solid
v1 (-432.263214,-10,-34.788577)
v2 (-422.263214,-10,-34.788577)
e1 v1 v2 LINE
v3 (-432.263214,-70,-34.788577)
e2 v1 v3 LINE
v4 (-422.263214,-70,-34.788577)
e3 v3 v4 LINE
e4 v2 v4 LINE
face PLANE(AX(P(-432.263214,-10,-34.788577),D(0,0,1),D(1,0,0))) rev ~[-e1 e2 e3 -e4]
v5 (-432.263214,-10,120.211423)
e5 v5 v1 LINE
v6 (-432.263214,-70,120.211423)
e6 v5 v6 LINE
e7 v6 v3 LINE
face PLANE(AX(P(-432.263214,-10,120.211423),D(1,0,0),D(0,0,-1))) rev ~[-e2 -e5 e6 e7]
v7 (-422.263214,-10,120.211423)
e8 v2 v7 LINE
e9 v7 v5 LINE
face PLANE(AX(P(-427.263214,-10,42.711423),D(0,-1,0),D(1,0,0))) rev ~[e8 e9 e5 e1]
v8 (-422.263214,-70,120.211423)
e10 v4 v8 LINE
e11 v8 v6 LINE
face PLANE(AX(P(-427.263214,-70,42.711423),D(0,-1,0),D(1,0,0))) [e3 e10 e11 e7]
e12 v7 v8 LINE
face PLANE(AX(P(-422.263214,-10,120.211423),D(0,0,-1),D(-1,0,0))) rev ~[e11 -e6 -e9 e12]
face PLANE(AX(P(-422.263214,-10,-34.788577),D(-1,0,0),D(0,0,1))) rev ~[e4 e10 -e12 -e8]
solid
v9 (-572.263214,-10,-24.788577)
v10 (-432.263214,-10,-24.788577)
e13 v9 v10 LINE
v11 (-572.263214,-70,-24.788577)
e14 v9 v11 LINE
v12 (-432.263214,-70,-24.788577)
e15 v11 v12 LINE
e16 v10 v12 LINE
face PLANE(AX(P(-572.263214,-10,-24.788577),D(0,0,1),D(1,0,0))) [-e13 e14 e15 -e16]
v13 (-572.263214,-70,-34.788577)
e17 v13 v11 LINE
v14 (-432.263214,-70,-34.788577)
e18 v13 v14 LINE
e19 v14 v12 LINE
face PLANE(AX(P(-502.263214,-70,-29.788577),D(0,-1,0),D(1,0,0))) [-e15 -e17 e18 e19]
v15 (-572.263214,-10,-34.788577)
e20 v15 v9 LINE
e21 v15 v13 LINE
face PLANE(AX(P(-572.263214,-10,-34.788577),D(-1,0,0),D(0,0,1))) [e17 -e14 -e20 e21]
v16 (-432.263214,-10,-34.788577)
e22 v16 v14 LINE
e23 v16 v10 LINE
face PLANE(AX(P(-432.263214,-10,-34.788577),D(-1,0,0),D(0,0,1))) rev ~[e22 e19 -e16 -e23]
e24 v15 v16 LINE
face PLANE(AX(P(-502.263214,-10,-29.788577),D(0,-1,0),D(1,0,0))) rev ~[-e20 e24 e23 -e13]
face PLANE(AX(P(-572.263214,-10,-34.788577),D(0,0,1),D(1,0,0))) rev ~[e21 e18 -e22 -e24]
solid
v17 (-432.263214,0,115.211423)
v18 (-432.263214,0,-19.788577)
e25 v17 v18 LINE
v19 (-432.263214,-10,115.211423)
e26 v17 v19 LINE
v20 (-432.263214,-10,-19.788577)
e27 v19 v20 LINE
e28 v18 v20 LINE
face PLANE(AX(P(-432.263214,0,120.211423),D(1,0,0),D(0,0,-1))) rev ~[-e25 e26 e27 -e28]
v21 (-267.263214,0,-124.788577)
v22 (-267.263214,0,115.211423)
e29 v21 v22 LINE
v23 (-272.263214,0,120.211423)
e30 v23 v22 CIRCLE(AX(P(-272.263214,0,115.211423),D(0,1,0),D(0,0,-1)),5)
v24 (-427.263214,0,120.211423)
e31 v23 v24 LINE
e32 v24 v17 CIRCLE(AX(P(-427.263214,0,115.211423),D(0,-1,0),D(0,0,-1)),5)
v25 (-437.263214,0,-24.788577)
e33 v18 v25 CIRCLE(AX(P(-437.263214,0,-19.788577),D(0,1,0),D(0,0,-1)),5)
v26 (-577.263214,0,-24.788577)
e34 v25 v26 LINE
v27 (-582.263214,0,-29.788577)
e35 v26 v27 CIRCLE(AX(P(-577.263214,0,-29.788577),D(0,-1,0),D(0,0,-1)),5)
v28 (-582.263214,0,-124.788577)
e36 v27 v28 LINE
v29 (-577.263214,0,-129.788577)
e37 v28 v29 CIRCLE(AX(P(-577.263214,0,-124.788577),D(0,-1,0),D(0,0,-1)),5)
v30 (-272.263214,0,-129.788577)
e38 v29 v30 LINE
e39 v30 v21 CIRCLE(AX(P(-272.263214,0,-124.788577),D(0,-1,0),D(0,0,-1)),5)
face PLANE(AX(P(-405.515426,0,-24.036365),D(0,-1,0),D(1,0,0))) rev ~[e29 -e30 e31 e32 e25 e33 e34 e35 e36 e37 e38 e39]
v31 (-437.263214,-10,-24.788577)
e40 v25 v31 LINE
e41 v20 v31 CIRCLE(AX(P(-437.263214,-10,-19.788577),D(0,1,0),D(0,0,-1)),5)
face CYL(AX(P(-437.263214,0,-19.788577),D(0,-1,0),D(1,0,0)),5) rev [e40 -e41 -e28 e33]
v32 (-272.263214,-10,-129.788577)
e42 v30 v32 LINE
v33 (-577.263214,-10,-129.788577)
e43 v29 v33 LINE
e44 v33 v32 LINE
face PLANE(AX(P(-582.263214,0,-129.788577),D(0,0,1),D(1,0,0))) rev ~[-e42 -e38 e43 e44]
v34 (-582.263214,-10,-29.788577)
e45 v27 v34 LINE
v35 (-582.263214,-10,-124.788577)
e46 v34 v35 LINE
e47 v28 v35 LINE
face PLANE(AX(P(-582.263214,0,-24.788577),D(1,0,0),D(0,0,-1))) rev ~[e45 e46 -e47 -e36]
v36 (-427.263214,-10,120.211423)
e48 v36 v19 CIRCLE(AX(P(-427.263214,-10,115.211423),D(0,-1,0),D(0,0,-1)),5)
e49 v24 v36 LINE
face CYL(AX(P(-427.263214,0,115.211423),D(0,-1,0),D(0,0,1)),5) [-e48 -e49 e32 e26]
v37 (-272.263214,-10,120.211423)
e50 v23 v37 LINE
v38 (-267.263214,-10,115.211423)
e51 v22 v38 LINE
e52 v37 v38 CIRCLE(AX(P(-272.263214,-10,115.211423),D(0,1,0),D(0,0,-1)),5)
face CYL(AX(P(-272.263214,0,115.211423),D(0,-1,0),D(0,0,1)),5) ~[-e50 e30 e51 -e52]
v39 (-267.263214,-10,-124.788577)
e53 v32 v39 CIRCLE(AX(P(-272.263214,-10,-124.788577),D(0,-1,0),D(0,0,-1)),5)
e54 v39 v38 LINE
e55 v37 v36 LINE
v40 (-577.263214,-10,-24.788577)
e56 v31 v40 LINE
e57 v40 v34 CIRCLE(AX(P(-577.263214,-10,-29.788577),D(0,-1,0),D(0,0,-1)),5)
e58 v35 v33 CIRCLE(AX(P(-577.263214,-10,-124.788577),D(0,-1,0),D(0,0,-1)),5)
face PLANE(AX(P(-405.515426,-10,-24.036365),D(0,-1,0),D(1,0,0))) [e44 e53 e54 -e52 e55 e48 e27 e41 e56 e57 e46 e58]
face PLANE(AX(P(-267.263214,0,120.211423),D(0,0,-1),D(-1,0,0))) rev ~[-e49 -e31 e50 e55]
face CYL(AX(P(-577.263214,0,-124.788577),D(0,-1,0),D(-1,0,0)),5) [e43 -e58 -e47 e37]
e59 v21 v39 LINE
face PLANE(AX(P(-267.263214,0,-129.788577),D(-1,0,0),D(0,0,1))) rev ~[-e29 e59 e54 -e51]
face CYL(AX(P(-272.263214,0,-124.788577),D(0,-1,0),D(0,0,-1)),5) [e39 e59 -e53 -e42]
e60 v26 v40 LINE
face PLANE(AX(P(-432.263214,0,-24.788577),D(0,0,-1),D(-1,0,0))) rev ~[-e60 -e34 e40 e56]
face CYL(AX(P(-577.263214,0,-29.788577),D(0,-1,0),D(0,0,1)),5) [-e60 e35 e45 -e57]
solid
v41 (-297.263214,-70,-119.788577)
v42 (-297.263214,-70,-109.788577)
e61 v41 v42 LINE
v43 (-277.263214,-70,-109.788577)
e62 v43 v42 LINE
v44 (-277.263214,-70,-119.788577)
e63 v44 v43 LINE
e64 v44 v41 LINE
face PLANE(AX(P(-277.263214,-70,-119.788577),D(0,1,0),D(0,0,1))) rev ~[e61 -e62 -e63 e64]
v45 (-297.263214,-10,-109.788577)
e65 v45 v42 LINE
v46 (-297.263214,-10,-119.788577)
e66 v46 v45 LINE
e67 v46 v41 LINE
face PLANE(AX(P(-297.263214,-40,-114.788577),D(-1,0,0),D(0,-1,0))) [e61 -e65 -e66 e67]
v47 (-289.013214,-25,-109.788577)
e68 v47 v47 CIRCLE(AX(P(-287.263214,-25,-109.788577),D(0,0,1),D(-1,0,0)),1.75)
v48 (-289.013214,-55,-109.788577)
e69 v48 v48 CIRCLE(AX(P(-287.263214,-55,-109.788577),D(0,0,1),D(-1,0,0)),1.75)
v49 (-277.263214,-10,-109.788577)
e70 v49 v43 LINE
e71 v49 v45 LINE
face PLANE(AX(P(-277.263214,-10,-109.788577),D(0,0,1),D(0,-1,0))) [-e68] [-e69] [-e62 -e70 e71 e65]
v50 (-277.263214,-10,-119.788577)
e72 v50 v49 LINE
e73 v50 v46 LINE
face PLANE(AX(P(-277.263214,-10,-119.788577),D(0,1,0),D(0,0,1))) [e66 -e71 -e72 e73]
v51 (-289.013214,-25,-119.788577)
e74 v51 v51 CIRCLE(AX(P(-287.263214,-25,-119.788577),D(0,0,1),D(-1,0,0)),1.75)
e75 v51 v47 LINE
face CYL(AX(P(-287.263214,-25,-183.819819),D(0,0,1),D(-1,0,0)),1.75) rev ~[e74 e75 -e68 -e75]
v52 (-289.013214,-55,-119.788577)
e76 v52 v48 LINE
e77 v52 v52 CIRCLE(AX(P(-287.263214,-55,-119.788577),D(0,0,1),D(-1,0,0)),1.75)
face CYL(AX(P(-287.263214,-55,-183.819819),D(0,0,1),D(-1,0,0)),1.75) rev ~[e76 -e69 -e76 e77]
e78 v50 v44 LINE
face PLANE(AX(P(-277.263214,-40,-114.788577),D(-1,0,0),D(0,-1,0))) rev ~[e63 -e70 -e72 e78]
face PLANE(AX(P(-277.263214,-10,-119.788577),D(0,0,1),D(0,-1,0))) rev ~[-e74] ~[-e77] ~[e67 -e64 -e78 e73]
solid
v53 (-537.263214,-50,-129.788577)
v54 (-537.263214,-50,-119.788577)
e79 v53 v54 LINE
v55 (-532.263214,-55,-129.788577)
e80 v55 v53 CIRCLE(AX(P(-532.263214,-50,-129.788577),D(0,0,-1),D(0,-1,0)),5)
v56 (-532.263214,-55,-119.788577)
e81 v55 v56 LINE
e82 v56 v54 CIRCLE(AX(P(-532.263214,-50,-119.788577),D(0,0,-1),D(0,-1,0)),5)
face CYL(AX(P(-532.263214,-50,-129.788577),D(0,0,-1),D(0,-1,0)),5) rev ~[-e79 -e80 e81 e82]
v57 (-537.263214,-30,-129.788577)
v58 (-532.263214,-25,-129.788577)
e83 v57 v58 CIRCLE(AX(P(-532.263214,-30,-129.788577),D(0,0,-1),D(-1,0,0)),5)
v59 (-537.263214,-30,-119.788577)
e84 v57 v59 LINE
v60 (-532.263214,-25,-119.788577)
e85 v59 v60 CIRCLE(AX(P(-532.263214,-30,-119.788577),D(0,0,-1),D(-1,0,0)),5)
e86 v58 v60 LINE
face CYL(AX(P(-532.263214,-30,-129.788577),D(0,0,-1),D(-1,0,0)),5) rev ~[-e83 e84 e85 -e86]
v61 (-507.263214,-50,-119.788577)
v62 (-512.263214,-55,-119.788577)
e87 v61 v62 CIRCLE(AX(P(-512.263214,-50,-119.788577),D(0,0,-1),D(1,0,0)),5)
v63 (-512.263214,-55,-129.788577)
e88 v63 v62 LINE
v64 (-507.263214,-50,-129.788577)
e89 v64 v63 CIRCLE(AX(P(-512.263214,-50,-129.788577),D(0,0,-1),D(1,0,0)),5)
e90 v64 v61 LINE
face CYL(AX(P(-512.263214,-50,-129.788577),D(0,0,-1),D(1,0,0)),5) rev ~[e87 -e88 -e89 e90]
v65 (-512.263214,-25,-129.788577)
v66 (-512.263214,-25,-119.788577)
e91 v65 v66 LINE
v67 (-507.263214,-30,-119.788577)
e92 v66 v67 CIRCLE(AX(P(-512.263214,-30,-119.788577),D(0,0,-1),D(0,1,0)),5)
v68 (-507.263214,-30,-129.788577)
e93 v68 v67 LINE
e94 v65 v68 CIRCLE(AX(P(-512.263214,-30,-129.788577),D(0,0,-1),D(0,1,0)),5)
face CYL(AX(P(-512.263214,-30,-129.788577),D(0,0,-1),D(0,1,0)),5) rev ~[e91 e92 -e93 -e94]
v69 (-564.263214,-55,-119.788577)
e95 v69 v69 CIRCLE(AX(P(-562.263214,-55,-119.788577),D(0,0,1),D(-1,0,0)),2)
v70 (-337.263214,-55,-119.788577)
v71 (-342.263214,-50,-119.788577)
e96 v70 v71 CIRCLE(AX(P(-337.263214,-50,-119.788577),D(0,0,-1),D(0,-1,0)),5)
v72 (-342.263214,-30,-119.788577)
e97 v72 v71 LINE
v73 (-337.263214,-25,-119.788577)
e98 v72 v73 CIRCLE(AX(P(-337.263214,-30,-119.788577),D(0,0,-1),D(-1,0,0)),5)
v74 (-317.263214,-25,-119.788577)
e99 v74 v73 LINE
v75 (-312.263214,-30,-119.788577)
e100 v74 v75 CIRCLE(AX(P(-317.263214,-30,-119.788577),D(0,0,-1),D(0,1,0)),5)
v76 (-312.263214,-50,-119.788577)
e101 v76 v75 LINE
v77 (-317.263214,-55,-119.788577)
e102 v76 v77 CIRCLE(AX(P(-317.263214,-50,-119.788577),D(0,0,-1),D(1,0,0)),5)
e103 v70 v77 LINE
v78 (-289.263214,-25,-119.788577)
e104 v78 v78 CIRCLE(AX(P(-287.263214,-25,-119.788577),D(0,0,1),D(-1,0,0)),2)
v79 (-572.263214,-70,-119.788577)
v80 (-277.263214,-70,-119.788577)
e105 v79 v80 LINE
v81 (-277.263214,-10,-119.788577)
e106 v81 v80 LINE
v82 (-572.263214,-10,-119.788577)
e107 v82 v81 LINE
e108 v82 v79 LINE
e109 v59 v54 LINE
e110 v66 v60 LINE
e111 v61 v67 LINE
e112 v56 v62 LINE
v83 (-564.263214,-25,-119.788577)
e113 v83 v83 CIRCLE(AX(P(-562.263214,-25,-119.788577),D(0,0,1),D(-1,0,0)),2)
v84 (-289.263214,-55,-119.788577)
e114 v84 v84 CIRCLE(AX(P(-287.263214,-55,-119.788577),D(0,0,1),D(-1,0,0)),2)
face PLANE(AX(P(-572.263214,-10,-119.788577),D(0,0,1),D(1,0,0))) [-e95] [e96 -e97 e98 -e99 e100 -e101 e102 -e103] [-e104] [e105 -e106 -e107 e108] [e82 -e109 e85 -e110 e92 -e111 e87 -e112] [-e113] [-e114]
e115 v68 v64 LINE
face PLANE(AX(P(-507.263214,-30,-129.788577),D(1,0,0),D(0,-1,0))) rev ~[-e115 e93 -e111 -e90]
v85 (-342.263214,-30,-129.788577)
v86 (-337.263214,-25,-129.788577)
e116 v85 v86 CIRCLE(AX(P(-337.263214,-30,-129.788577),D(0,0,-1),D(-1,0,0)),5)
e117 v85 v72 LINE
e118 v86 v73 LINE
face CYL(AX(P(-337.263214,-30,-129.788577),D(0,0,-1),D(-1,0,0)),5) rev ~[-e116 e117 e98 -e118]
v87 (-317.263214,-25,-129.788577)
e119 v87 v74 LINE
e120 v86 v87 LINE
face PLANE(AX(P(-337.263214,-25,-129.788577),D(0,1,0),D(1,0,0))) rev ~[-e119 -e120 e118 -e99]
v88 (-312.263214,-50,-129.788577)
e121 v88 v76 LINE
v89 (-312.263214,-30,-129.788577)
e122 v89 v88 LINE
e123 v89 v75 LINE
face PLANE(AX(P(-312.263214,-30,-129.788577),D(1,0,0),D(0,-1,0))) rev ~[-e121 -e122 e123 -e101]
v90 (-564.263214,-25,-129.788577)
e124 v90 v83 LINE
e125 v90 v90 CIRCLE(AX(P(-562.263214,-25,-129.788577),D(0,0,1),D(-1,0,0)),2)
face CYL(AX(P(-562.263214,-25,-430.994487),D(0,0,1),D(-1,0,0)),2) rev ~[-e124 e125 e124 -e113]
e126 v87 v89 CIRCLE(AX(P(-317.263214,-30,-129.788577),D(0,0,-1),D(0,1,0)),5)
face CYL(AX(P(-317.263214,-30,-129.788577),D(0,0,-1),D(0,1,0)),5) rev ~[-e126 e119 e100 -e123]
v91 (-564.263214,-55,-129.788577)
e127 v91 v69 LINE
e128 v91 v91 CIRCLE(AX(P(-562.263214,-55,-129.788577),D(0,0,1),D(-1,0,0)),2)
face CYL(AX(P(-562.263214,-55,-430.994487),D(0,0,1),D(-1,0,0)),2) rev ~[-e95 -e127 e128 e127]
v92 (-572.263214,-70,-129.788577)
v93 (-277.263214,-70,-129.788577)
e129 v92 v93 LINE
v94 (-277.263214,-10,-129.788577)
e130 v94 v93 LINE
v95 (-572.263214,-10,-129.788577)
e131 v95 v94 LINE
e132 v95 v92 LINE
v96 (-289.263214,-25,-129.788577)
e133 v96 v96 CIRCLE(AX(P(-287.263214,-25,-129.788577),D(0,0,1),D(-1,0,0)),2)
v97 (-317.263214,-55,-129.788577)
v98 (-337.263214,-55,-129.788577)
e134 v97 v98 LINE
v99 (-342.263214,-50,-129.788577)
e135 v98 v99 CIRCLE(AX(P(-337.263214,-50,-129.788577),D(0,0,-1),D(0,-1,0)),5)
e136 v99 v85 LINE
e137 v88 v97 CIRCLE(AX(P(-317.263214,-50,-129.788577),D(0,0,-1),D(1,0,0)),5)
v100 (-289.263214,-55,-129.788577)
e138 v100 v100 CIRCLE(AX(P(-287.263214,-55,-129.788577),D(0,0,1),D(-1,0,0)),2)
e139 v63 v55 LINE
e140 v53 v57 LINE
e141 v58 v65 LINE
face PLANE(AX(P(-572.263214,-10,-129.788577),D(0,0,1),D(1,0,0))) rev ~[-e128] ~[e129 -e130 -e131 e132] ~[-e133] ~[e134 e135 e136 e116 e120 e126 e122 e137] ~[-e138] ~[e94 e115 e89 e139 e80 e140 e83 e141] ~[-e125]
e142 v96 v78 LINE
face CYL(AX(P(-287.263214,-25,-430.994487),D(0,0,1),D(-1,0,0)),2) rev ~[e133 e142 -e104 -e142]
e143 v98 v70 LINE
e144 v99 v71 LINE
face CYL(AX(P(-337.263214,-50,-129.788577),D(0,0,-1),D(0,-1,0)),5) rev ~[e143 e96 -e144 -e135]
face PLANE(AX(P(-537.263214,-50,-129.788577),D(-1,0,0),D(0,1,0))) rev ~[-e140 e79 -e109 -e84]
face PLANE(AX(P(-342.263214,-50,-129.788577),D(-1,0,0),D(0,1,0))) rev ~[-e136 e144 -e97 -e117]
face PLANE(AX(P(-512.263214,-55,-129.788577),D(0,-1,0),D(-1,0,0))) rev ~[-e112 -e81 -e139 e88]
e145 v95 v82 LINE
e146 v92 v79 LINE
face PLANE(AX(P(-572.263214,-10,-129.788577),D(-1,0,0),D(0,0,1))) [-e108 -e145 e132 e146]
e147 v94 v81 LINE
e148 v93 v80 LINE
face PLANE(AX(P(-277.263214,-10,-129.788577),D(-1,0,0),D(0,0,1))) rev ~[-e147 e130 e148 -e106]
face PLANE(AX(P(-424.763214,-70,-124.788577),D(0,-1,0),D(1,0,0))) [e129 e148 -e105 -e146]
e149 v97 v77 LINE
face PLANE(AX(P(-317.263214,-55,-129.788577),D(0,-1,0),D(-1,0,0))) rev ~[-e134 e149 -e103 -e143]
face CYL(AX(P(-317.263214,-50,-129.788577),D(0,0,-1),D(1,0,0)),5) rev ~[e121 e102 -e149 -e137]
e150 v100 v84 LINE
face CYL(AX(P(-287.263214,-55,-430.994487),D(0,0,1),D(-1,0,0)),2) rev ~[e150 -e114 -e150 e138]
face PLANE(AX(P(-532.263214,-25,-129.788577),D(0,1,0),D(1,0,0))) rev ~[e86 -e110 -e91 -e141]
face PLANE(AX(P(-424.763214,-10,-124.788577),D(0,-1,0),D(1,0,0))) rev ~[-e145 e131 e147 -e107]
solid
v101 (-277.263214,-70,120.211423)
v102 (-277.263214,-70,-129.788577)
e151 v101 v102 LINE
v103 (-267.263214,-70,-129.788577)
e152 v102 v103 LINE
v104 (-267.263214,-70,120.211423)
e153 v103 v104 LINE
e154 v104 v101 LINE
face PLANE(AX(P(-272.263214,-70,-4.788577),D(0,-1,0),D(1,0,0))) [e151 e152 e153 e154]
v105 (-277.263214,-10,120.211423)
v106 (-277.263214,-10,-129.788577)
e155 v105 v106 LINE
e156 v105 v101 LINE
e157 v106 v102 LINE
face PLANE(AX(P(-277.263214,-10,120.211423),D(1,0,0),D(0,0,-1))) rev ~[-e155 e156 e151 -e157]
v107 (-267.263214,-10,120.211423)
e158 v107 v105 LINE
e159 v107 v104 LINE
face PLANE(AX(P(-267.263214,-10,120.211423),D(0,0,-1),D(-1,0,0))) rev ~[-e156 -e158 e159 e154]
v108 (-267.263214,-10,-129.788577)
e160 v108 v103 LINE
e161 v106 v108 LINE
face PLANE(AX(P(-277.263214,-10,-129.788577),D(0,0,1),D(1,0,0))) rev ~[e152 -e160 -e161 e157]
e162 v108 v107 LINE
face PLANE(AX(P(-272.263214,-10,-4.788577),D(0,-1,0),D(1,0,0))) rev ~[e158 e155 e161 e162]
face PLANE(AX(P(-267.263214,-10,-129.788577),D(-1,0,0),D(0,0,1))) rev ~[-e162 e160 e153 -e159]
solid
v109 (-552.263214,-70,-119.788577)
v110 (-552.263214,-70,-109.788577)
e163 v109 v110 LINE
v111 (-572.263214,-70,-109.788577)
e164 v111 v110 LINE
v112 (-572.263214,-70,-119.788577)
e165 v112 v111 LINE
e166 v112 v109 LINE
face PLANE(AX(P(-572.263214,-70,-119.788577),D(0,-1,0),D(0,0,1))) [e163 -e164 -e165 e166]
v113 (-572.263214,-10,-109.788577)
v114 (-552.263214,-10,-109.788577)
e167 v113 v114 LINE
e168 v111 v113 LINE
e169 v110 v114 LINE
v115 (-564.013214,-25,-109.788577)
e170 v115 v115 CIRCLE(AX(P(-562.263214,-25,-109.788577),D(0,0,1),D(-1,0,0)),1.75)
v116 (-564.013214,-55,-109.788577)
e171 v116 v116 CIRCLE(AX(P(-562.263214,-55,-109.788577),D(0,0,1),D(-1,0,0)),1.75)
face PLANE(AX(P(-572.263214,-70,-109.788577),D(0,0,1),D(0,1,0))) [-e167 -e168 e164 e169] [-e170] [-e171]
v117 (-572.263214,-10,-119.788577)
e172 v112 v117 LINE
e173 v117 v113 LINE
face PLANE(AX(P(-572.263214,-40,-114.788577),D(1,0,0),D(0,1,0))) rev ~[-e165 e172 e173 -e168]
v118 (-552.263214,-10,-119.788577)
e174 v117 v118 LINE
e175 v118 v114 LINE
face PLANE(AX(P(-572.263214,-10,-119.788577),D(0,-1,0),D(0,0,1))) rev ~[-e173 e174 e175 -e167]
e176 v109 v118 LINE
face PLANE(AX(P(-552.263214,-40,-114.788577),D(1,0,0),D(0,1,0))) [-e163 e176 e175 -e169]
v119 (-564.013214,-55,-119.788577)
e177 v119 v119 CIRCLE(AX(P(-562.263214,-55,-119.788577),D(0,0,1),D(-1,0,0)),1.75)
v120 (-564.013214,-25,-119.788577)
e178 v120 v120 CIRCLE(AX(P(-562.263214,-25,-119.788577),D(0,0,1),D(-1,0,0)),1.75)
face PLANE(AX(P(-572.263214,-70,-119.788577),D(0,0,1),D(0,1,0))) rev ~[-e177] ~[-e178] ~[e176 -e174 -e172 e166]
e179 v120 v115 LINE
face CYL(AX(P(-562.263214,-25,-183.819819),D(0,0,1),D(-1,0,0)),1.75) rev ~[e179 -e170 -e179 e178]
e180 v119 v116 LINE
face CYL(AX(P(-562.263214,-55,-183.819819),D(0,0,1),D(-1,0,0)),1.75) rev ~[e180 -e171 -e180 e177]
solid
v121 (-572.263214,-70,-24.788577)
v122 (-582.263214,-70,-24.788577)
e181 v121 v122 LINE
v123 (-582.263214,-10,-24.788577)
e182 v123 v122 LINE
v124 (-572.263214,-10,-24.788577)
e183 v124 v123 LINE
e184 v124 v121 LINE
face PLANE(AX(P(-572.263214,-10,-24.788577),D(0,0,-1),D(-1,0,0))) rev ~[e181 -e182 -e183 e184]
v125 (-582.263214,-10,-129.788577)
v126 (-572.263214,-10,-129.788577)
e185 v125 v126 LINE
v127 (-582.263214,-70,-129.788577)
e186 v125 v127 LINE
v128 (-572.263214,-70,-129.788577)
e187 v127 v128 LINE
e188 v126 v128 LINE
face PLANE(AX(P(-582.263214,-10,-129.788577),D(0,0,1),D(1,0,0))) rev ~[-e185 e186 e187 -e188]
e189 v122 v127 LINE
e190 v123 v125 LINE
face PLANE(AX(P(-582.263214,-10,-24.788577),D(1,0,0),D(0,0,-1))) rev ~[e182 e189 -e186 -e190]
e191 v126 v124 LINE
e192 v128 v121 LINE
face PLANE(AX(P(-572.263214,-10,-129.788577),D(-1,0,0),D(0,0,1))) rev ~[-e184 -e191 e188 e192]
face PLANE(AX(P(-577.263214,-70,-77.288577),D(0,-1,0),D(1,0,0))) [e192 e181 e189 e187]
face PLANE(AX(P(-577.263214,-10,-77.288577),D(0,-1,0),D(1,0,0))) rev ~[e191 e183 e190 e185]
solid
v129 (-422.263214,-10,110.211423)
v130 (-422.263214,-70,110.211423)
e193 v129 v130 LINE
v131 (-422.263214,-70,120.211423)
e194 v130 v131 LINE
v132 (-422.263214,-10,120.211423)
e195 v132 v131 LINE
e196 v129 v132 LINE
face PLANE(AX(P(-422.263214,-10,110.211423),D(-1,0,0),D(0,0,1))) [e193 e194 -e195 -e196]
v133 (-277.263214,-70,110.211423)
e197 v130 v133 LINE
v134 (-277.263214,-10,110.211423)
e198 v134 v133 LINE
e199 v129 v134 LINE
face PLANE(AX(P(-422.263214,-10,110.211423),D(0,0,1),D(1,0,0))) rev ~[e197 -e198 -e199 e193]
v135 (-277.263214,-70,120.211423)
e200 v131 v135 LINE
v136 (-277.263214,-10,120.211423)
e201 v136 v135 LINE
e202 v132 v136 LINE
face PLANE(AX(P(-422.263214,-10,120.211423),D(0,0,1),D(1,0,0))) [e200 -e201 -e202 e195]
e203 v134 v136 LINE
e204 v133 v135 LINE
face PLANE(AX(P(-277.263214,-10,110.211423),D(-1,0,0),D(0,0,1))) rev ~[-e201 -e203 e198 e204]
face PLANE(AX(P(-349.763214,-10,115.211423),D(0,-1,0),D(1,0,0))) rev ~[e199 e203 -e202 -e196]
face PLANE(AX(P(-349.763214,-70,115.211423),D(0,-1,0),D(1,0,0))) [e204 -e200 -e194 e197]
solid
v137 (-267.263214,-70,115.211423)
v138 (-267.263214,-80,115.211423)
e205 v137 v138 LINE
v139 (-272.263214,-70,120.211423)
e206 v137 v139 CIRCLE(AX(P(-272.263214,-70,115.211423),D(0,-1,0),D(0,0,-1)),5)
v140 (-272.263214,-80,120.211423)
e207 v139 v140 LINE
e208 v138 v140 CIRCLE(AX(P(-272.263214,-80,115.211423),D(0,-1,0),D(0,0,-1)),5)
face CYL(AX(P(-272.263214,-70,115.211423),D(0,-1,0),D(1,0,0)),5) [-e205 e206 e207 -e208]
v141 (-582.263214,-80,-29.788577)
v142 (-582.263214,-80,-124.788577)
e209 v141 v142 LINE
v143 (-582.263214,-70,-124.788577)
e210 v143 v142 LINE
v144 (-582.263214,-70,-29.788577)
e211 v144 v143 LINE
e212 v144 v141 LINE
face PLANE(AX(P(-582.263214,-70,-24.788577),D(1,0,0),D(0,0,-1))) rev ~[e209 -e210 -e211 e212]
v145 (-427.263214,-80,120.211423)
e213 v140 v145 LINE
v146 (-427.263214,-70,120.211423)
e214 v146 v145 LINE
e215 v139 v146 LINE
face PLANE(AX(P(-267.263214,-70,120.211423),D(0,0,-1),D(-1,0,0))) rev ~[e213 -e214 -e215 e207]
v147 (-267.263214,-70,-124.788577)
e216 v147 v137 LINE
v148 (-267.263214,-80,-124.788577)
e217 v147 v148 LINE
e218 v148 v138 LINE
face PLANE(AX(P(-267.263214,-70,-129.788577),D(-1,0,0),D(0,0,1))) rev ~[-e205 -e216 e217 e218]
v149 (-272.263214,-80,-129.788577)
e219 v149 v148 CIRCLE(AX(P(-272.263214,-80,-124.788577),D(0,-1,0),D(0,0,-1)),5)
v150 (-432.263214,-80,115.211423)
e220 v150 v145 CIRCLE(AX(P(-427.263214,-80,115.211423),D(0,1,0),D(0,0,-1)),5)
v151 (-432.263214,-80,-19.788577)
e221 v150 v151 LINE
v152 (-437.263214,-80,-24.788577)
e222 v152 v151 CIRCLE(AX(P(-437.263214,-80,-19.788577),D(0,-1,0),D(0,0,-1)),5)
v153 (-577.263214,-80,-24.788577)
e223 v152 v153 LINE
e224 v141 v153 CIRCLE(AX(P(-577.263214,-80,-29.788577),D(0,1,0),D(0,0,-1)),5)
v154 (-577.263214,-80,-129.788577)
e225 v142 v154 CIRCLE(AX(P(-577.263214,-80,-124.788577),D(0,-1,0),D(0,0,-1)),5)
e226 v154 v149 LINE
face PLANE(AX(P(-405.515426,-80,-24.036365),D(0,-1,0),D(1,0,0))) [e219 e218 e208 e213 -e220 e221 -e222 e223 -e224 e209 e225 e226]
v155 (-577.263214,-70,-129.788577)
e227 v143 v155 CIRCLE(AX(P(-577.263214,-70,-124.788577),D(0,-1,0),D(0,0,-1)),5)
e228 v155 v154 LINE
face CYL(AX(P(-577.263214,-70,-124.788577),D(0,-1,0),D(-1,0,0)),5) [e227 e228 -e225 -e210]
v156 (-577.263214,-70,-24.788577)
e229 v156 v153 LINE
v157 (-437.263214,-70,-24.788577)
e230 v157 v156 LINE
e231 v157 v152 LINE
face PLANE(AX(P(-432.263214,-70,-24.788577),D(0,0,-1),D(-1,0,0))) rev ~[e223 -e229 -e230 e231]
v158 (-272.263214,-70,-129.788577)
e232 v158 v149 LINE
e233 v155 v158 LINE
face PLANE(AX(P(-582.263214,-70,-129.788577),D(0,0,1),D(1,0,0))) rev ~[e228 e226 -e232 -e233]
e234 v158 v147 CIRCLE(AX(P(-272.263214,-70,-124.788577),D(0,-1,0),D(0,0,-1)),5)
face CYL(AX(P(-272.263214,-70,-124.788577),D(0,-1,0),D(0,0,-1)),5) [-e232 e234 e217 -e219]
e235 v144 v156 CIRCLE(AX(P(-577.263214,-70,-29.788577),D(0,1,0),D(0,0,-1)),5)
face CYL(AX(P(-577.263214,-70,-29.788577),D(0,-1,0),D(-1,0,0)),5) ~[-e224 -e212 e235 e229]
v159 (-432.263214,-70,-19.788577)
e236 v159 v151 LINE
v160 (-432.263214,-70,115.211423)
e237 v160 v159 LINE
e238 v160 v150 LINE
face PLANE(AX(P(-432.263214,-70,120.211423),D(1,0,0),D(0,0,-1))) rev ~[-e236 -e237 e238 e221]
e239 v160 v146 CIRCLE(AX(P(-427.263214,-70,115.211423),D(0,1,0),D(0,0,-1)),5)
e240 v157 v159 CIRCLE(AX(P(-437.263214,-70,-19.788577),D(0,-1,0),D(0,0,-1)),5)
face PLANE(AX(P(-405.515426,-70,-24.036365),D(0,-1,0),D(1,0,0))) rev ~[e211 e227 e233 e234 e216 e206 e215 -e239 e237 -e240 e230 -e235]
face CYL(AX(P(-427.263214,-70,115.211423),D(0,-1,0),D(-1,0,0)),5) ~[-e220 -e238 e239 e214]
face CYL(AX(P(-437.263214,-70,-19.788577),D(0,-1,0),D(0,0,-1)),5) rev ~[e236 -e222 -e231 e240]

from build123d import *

# Parameters (mm, degrees)
F1_DEPTH     = 10
F3_DEPTH     = 60
F2_W         = 140
F2_H         = 10
F4_DEPTH     = 60
F5_DEPTH     = 60
F2_W_2       = 145
F6_DEPTH     = 60
F7_DEPTH     = 60
F2_W_3       = 295
F8_DEPTH     = 60
F10_DEPTH    = 13
F12_DEPTH    = 10
F13_R        = 5
F14_R        = 5
F14_2_R      = 5
F15_W        = 60
F15_H        = 10
F16_DEPTH    = 20
F17_W        = 60
F17_H        = 10
F18_DEPTH    = 20
F20_D        = 4
F23_D        = 3.5
F23_ON_F22_D = 3.5


with BuildPart() as f1:
    # F0 (on Front) → F1 (new body)
    with BuildSketch(Plane.XZ):
        Polygon((-267.2632135372, 120.211422946), (-432.2632135372, 120.211422946), (-432.2632135372, -24.788577054), (-582.2632135372, -24.788577054), (-582.2632135372, -129.788577054), (-267.2632135372, -129.788577054), align=None)
    extrude(amount=F1_DEPTH)

    # F14
    f14_edges = [f1.edges().sort_by_distance(p)[0] for p in [
        (-582.263214, -5, -129.788577),
        (-582.263214, -5, -24.788577),
        (-432.263214, -5, -24.788577),
        (-432.263214, -5, 120.211423),
        (-267.263214, -5, 120.211423),
        (-267.263214, -5, -129.788577),
    ]]
    fillet(f14_edges, radius=F14_R)


with BuildPart() as f3:
    # F2 (on face) → F3 (new body)
    with BuildSketch(Plane.XZ.offset(10)):
        Polygon((-572.2632135372, -24.788577054), (-582.2632135372, -24.788577054), (-582.2632135372, -129.788577054), (-572.2632135372, -129.788577054), (-572.2632135372, -119.788577054), (-572.2632135372, -34.788577054), align=None)
    extrude(amount=F3_DEPTH)


with BuildPart() as f4:
    # F2 (on face) → F4 (new body)
    with BuildSketch(Plane.XZ.offset(10)):
        with Locations((-502.2632135372, -29.788577054)):
            Rectangle(F2_W, F2_H)
    extrude(amount=F4_DEPTH)


with BuildPart() as f5:
    # F2 (on face) → F5 (new body)
    with BuildSketch(Plane.XZ.offset(10)):
        Polygon((-432.2632135372, 120.211422946), (-432.2632135372, -24.788577054), (-432.2632135372, -34.788577054), (-422.2632135372, -34.788577054), (-422.2632135372, 110.211422946), (-422.2632135372, 120.211422946), align=None)
    extrude(amount=F5_DEPTH)


with BuildPart() as f6:
    # F2 (on face) → F6 (new body)
    with BuildSketch(Plane.XZ.offset(10)):
        with Locations((-349.7632135372, 115.211422946)):
            Rectangle(F2_W_2, F2_H)
    extrude(amount=F6_DEPTH)


with BuildPart() as f7:
    # F2 (on face) → F7 (new body)
    with BuildSketch(Plane.XZ.offset(10)):
        Polygon((-277.2632135372, -119.788577054), (-277.2632135372, -129.788577054), (-267.2632135372, -129.788577054), (-267.2632135372, 120.211422946), (-277.2632135372, 120.211422946), (-277.2632135372, 110.211422946), align=None)
    extrude(amount=F7_DEPTH)


with BuildPart() as f8:
    # F2 (on face) → F8 (new body)
    with BuildSketch(Plane.XZ.offset(10)):
        with Locations((-424.7632135372, -124.788577054)):
            Rectangle(F2_W_3, F2_H)
    extrude(amount=F8_DEPTH)

    # F9 (on face) → F10 (cut)
    with BuildSketch(Plane(origin=(0, 0, -129.788577054), x_dir=(1, 0, 0), z_dir=(0, 0, -1))):
        with BuildLine():
            Line((-512.2632135372, 55), (-532.2632135372, 55))
            ThreePointArc((-532.2632135372, 55), (-535.7987474431, 53.5355339059), (-537.2632135372, 50))
            Line((-537.2632135372, 50), (-537.2632135372, 30))
            ThreePointArc((-537.2632135372, 30), (-535.7987474431, 26.4644660941), (-532.2632135372, 25))
            Line((-532.2632135372, 25), (-512.2632135372, 25))
            ThreePointArc((-512.2632135372, 25), (-508.7276796312, 26.4644660941), (-507.2632135372, 30))
            Line((-507.2632135372, 30), (-507.2632135372, 50))
            ThreePointArc((-507.2632135372, 50), (-508.7276796312, 53.5355339059), (-512.2632135372, 55))
        make_face()
        with BuildLine():
            Line((-317.2632135372, 55), (-337.2632135372, 55))
            ThreePointArc((-337.2632135372, 55), (-340.7987474431, 53.5355339059), (-342.2632135372, 50))
            Line((-342.2632135372, 50), (-342.2632135372, 30))
            ThreePointArc((-342.2632135372, 30), (-340.7987474431, 26.4644660941), (-337.2632135372, 25))
            Line((-337.2632135372, 25), (-317.2632135372, 25))
            ThreePointArc((-317.2632135372, 25), (-313.7276796312, 26.4644660941), (-312.2632135372, 30))
            Line((-312.2632135372, 30), (-312.2632135372, 50))
            ThreePointArc((-312.2632135372, 50), (-313.7276796312, 53.5355339059), (-317.2632135372, 55))
        make_face()
    extrude(amount=-F10_DEPTH, mode=Mode.SUBTRACT)

    # F20 (through all)
    with Locations(Plane(origin=(0, 0, -129.788577054), x_dir=(1, 0, 0), z_dir=(0, 0, -1))):
        with Locations((-562.2632135372, 55), (-562.2632135372, 25), (-287.2632135372, 55), (-287.2632135372, 25)):
            Hole(F20_D / 2)


with BuildPart() as f12:
    # F11 (on face) → F12 (new body)
    with BuildSketch(Plane.XZ.offset(70)):
        Polygon((-267.2632135372, 120.211422946), (-432.2632135372, 120.211422946), (-432.2632135372, -24.788577054), (-582.2632135372, -24.788577054), (-582.2632135372, -129.788577054), (-267.2632135372, -129.788577054), align=None)
    extrude(amount=F12_DEPTH)

    # F13
    f13_edges = [f12.edges().sort_by_distance(p)[0] for p in [
        (-582.263214, -75, -129.788577),
    ]]
    fillet(f13_edges, radius=F13_R)

    # F14#2
    f14_2_edges = [f12.edges().sort_by_distance(p)[0] for p in [
        (-582.263214, -75, -24.788577),
        (-432.263214, -75, -24.788577),
        (-432.263214, -75, 120.211423),
        (-267.263214, -75, 120.211423),
        (-267.263214, -75, -129.788577),
    ]]
    fillet(f14_2_edges, radius=F14_2_R)


with BuildPart() as f16:
    # F15 (on face) → F16 (new body)
    with BuildSketch(Plane.YZ.offset(-572.2632135372)):
        with Locations((-40, -114.788577054)):
            Rectangle(F15_W, F15_H)
    extrude(amount=F16_DEPTH)

    # F23 (through all)
    with Locations(Plane(origin=(0, 0, -119.788577054), x_dir=(1, 0, 0), z_dir=(0, 0, -1))):
        with Locations((-562.2632135372, 55), (-562.2632135372, 25)):
            Hole(F23_D / 2)


with BuildPart() as f18:
    # F17 (on face) → F18 (new body)
    with BuildSketch(Plane(origin=(-277.2632135372, 0, 0), x_dir=(0, -1, 0), z_dir=(-1, 0, 0))):
        with Locations((40, -114.788577054)):
            Rectangle(F17_W, F17_H)
    extrude(amount=F18_DEPTH)

    # F23 on F22 (through all)
    with Locations(Plane(origin=(0, 0, -119.788577054), x_dir=(1, 0, 0), z_dir=(0, 0, -1))):
        with Locations((-287.2632135372, 55), (-287.2632135372, 25)):
            Hole(F23_ON_F22_D / 2)


solid = Compound([f1.part, f3.part, f4.part, f5.part, f6.part, f7.part, f8.part, f12.part, f16.part, f18.part])
